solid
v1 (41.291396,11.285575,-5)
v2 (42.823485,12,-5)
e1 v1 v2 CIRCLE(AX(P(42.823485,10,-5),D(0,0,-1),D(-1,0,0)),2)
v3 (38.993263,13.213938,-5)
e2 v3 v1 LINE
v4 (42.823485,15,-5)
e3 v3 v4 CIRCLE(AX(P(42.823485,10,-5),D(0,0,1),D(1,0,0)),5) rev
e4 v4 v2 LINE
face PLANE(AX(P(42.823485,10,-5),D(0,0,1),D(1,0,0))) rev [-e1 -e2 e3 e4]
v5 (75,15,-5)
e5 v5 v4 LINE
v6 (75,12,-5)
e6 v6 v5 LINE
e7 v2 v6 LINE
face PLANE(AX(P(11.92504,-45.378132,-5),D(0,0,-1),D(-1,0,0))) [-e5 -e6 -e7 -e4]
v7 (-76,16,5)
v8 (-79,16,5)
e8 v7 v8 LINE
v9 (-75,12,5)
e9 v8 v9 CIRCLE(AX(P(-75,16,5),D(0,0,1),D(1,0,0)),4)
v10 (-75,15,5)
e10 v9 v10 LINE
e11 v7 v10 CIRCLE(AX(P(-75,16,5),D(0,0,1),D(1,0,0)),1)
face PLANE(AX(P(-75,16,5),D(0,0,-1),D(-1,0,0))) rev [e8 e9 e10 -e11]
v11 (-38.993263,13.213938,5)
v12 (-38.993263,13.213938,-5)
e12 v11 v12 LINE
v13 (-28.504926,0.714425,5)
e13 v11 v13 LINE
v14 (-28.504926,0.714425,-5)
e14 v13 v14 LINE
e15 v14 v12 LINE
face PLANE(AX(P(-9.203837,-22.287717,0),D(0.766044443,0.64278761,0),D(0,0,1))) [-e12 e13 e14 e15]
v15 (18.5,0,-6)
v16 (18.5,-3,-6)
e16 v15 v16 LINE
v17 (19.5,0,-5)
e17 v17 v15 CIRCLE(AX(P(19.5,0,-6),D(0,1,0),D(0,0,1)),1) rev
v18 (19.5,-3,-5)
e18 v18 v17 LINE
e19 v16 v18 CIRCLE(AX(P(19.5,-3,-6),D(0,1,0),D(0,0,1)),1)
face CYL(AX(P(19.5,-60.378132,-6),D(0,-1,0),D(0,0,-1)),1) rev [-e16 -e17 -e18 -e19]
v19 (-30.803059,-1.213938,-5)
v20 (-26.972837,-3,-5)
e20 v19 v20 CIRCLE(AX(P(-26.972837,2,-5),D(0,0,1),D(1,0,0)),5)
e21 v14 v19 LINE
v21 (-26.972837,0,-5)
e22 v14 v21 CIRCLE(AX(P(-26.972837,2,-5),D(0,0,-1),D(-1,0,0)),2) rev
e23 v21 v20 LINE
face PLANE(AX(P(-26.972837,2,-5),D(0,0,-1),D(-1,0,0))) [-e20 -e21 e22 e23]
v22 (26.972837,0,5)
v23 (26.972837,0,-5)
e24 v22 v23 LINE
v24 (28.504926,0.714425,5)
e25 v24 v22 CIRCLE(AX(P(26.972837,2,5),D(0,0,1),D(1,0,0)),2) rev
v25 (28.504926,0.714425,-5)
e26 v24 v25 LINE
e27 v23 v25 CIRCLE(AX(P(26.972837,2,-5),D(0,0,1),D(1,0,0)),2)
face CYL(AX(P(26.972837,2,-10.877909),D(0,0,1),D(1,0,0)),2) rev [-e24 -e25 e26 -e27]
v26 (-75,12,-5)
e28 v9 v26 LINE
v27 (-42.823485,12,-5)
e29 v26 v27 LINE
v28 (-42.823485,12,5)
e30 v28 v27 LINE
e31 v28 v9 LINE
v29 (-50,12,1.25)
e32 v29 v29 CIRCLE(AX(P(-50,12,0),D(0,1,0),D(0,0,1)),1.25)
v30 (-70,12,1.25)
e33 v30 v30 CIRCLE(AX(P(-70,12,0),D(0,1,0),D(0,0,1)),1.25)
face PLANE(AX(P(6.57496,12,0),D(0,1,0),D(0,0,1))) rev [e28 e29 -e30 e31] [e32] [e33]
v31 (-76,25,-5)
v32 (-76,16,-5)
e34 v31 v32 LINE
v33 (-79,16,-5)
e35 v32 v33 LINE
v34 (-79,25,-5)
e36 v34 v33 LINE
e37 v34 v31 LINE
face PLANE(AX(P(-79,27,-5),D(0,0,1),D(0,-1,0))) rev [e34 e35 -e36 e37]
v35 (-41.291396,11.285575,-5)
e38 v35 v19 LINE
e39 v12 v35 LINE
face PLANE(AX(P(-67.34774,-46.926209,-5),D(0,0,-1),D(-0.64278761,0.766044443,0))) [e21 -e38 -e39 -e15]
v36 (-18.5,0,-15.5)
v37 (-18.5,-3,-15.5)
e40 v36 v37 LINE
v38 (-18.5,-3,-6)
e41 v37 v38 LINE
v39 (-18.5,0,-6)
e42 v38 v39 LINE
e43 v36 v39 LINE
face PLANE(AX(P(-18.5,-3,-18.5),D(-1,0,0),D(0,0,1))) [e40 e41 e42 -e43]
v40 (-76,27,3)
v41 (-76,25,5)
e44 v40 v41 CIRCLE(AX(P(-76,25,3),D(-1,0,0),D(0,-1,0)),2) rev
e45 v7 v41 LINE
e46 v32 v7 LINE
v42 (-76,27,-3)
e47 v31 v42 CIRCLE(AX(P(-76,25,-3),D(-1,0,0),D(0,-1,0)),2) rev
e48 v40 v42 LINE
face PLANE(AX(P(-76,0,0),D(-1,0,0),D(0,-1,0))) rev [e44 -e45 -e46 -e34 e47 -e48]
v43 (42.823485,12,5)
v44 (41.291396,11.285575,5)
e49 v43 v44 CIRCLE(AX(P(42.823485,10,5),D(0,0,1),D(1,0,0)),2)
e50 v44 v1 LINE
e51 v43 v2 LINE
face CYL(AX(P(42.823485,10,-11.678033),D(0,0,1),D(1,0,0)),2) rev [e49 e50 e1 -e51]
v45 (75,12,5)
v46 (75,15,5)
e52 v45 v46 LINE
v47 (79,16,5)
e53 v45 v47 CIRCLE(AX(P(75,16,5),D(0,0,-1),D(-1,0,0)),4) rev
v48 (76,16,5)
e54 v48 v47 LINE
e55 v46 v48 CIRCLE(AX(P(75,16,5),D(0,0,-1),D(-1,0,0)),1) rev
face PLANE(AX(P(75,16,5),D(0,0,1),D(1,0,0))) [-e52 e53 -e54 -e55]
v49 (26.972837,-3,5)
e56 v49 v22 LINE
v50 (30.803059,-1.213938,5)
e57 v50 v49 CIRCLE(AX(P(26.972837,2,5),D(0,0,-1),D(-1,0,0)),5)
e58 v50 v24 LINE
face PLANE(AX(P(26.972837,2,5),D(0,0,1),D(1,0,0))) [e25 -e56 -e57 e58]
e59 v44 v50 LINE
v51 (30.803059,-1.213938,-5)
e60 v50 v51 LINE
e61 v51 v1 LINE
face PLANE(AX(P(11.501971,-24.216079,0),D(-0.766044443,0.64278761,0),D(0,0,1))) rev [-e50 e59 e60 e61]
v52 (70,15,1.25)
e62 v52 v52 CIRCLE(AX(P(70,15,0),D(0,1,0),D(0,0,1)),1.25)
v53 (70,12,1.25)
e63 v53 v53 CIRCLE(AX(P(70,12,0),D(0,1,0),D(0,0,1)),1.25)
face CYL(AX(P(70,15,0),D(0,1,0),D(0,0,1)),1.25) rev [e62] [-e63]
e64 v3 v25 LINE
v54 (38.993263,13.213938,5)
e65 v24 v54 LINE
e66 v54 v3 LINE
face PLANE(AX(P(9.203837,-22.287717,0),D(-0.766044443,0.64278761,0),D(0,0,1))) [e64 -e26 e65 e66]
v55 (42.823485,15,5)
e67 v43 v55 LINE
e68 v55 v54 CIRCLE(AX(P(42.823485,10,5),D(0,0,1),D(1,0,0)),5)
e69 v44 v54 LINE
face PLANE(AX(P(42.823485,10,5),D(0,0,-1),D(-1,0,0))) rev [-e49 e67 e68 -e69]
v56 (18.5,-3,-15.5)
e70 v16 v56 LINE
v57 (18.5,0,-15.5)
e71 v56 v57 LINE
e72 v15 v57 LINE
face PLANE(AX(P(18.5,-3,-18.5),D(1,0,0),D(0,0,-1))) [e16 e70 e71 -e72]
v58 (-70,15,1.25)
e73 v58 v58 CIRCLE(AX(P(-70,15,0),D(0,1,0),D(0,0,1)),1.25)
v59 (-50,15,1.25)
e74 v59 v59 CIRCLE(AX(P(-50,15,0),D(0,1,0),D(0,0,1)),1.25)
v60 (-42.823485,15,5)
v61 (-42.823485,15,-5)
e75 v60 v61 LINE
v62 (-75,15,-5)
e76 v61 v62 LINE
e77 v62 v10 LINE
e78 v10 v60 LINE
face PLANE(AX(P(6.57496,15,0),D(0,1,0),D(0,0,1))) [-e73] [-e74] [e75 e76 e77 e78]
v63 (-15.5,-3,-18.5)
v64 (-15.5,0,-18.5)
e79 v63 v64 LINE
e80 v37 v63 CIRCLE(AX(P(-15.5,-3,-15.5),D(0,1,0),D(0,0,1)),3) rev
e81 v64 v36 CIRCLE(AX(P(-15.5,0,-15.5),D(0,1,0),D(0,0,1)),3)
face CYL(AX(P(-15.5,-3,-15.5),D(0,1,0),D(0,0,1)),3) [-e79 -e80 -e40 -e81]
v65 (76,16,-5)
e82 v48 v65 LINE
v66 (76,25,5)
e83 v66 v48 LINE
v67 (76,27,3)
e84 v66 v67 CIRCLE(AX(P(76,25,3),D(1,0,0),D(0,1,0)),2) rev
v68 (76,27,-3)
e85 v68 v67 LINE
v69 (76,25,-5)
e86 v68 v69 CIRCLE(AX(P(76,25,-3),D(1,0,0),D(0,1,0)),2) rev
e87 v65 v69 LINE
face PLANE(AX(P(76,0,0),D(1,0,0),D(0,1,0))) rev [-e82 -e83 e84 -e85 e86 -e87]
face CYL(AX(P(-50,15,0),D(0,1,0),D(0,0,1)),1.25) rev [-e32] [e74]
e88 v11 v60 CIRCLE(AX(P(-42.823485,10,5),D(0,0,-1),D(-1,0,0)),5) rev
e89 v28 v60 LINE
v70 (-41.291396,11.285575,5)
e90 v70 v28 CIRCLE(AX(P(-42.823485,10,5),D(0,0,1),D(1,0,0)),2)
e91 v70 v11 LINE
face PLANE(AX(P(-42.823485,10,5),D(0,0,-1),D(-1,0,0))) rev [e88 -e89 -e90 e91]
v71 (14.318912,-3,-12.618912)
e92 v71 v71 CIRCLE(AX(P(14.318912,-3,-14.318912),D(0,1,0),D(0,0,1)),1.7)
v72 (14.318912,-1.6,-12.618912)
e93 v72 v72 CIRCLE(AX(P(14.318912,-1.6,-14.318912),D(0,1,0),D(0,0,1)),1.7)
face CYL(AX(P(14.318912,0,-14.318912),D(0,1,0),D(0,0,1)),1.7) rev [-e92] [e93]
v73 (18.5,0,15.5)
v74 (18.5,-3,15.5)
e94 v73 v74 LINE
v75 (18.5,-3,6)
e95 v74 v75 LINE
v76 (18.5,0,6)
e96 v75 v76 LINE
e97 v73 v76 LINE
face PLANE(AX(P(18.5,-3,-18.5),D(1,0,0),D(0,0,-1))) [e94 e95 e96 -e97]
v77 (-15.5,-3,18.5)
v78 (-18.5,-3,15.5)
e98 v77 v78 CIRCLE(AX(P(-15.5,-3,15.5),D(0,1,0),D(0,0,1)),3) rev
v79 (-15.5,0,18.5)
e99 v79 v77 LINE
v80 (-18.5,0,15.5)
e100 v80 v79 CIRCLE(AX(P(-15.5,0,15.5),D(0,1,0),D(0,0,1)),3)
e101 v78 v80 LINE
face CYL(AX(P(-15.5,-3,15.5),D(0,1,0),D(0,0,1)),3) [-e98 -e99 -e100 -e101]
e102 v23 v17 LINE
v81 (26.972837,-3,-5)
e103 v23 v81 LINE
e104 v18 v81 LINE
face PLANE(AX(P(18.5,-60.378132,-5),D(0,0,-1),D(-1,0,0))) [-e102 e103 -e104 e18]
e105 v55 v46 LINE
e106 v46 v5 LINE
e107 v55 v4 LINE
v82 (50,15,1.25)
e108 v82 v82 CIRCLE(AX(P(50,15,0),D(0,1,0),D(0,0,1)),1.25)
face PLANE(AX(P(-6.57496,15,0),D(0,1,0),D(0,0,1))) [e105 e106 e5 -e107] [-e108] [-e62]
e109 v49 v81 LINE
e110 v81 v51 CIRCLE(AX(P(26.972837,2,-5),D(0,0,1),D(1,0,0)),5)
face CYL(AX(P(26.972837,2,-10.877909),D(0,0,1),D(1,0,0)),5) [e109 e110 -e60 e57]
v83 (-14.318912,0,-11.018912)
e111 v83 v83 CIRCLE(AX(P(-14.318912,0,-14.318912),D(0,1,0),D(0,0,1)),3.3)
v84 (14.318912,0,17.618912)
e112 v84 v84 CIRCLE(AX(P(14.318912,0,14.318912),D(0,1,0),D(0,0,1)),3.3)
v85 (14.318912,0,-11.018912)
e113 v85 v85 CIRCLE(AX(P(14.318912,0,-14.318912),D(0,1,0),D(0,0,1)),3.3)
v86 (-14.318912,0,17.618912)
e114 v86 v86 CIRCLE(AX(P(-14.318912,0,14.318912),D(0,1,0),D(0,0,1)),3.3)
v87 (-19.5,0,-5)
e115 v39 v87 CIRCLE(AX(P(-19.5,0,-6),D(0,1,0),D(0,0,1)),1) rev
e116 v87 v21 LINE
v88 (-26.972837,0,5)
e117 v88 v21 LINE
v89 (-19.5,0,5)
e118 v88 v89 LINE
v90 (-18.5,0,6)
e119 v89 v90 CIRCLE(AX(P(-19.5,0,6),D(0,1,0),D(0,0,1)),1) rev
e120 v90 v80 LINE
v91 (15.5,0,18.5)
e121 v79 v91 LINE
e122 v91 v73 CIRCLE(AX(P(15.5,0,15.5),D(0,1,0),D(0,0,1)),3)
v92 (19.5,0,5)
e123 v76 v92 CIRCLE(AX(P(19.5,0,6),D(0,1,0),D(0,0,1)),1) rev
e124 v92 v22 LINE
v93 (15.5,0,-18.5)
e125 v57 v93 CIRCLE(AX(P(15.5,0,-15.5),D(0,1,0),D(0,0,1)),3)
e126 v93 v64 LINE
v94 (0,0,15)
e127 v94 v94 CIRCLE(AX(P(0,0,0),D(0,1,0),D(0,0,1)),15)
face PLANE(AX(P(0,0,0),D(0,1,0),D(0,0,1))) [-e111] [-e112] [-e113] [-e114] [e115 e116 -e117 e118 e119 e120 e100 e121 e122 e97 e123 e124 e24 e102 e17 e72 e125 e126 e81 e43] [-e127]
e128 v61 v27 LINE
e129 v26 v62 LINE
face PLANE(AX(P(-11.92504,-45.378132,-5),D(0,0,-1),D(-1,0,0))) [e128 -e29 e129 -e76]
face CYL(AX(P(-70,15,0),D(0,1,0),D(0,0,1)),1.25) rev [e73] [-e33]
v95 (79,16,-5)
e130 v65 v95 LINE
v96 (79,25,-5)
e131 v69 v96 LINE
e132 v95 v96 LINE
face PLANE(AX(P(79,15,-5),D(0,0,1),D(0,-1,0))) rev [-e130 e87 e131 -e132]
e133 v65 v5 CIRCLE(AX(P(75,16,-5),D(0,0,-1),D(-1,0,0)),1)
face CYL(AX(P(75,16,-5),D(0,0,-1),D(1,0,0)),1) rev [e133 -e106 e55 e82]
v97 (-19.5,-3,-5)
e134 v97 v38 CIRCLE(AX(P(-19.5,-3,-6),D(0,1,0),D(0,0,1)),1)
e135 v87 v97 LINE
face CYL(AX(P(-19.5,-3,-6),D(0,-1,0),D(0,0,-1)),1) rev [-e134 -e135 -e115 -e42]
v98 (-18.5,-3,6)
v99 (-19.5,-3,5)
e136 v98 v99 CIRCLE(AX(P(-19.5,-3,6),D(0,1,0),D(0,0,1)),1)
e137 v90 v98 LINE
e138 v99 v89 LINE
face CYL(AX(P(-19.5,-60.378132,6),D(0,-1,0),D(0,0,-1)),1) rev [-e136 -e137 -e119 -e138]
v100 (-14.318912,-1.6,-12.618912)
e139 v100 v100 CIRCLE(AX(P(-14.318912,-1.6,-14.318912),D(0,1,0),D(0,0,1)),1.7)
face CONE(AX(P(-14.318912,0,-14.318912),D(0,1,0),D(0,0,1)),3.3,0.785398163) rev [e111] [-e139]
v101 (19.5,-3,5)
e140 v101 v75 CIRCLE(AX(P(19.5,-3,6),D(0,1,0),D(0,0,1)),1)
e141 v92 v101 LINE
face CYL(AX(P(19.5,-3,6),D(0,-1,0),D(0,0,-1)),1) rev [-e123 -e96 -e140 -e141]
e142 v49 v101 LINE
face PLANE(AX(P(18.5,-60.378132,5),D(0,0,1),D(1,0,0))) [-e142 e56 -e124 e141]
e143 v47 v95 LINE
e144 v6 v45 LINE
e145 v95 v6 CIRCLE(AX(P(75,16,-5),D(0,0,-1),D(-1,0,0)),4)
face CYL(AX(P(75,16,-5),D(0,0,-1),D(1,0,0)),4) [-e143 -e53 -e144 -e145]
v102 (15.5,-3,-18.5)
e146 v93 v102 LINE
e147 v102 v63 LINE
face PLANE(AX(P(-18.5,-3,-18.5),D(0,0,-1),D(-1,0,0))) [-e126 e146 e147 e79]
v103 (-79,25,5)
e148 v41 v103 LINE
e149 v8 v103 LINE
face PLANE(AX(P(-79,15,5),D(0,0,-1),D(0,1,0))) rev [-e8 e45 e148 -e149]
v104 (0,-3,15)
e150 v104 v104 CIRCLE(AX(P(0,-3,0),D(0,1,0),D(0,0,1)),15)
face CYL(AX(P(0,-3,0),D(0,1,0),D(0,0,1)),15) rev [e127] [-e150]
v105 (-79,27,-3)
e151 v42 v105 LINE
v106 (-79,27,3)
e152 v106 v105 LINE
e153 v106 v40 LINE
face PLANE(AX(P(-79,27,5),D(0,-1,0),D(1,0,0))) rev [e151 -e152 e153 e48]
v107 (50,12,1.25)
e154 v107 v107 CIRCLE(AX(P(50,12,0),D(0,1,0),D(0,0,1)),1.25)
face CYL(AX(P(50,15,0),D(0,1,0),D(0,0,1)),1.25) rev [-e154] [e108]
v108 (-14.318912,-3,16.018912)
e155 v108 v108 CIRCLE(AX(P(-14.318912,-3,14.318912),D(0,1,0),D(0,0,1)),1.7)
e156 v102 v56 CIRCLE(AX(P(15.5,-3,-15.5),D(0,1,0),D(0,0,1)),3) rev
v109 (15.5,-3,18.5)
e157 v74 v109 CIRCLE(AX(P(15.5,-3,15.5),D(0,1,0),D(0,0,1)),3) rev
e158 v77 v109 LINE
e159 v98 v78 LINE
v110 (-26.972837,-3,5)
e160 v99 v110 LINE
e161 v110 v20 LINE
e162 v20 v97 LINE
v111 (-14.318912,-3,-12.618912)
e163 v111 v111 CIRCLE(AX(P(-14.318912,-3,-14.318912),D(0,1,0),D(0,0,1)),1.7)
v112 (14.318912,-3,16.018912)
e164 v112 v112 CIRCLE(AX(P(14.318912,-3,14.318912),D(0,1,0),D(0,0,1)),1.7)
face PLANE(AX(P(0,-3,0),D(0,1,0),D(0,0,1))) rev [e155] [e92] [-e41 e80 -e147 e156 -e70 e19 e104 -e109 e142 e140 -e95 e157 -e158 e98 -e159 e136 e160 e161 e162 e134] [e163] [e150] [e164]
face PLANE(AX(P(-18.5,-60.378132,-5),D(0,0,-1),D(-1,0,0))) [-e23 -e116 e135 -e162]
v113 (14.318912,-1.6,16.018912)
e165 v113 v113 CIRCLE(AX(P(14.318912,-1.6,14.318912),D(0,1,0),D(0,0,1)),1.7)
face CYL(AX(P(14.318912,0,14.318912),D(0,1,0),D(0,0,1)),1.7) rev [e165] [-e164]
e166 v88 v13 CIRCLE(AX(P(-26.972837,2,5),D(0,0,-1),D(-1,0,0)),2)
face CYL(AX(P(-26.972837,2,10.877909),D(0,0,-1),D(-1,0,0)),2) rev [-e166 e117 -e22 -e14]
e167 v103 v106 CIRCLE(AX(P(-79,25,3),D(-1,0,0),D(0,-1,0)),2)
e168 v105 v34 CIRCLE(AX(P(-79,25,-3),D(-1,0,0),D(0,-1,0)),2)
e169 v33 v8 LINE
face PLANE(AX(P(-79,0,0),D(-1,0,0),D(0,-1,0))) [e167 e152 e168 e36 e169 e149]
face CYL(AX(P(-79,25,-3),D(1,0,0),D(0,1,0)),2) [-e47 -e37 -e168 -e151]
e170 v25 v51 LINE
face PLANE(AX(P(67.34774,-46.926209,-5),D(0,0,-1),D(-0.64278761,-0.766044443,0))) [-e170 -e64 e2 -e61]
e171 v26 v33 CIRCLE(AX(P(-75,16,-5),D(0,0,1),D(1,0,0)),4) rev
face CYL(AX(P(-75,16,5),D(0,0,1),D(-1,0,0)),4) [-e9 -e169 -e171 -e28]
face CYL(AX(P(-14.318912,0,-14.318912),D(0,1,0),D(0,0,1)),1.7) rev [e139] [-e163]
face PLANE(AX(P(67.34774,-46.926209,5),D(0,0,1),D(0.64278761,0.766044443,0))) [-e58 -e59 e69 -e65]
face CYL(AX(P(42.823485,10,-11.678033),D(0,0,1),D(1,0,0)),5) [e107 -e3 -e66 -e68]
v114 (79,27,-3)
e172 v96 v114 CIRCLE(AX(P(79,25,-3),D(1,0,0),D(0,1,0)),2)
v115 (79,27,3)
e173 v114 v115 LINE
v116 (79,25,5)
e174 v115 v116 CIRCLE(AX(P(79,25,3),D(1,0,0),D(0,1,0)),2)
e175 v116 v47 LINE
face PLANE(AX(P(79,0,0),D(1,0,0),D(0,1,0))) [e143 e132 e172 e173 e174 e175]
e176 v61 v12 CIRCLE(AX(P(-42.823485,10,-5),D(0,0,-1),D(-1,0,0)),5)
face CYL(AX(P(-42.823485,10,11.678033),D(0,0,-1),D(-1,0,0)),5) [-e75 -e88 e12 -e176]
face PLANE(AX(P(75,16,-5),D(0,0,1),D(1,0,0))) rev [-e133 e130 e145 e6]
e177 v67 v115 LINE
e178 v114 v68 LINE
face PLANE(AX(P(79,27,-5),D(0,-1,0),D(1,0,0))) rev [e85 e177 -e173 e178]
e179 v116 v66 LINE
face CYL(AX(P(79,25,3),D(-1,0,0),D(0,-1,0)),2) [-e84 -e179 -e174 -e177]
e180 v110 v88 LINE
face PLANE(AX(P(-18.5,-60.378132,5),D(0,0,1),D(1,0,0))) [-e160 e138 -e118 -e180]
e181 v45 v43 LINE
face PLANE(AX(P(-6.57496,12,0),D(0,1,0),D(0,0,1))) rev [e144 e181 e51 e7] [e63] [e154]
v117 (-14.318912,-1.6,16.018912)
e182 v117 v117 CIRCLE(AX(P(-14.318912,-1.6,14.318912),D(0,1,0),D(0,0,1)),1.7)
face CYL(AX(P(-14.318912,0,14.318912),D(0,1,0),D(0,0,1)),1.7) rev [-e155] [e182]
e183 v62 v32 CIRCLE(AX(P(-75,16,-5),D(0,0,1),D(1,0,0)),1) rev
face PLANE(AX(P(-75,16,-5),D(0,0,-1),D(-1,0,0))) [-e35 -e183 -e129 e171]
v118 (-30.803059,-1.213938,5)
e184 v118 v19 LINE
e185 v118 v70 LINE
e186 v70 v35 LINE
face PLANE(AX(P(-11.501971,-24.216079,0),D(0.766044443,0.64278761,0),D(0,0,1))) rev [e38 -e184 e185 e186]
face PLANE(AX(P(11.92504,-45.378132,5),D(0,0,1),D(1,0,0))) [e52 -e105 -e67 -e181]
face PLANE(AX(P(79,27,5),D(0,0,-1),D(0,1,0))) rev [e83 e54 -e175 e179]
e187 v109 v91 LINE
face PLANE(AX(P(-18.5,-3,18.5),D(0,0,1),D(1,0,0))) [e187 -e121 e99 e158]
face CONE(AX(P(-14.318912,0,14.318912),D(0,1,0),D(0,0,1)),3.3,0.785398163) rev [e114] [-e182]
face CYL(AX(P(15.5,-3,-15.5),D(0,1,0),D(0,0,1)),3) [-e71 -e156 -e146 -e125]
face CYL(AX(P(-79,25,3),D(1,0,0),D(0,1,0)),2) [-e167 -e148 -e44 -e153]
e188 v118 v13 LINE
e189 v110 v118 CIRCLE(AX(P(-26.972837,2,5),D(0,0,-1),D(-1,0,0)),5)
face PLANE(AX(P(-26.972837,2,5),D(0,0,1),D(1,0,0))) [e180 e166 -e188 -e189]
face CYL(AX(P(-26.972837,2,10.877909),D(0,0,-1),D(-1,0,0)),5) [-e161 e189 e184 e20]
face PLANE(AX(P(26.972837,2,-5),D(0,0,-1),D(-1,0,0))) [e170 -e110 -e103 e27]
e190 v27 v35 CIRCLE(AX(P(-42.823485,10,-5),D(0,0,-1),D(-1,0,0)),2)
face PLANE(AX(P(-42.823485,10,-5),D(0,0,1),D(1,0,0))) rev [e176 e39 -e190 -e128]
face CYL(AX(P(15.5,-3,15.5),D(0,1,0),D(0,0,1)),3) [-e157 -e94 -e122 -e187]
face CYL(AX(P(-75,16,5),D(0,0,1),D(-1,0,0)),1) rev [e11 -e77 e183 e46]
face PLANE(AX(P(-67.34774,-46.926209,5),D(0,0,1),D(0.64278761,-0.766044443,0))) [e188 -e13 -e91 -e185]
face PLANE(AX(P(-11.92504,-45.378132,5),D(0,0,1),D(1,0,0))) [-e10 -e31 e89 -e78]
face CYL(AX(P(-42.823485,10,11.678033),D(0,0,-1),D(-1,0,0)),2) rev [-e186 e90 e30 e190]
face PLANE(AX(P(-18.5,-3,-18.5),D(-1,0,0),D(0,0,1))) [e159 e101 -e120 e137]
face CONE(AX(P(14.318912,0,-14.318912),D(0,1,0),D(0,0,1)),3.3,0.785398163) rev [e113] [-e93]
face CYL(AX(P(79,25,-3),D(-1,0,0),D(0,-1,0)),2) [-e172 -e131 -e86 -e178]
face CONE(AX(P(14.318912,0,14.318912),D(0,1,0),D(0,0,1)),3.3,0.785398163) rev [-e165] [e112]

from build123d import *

# Parameters (mm, degrees)
SKETCH_1_W                  = 37
SKETCH_1_H                  = 37
SKETCH_1_R                  = 15
SKETCH_1_R_2                = 1.65
SM_BASE_FLANGE_1_DEPTH      = 3
FILLET_1_R                  = 3
SKETCH_6_W                  = 56.5
SKETCH_6_H                  = 10
EXTRUDE_1_DEPTH             = 3
OTHER_START                 = -5
OTHER_1_DEPTH               = 10
OTHER_1_2_DEPTH             = 10
OTHER_2_DEPTH               = 10
OTHER_2_2_DEPTH             = 10
SM_EDGE_FLANGE_1_DEPTH      = 10
SM_EDGE_FLANGE_2_DEPTH      = 10
SKETCH_18_R                 = 1
CUT_EXTRUDE_2_DEPTH         = 10
HOLE_WIZARD_M3_2_AT_2_COUNT = 2
HOLE_WIZARD_M3_2_AT_2_PITCH = 28.637824638
HOLE_WIZARD_M3_2_AT_3_COUNT = 2
HOLE_WIZARD_M3_2_AT_3_PITCH = 40.5
HOLE_WIZARD_M3_2_AT_4_COUNT = 2
HOLE_WIZARD_M3_2_AT_4_PITCH = 28.637824638
HOLE_WIZARD_M3_2_2_D        = 2.5
FILLET_2_R                  = 2
FILLET_3_R                  = 1


# Read off the part's stored shape, not the designer's step: 转折1, 转折2
# Sheet-metal steps are written as plain solids
with BuildPart() as part:
    # Sketch 1 → 基体-法兰1 (new body)
    with BuildSketch(Plane(origin=(0, 0, 0), x_dir=(1, 0, 0), z_dir=(0, 1, 0))):
        Rectangle(SKETCH_1_W, SKETCH_1_H)
        with Locations(Location((0, 0, 0), (0, 0, 270))):
            Circle(SKETCH_1_R, mode=Mode.SUBTRACT)
        with Locations(Location((-14.318912319, 14.318912319, 0), (0, 0, 270))):
            Circle(SKETCH_1_R_2, mode=Mode.SUBTRACT)
        with Locations(Location((14.318912319, 14.318912319, 0), (0, 0, 270))):
            Circle(SKETCH_1_R_2, mode=Mode.SUBTRACT)
        with Locations(Location((14.318912319, -14.318912319, 0), (0, 0, 270))):
            Circle(SKETCH_1_R_2, mode=Mode.SUBTRACT)
        with Locations(Location((-14.318912319, -14.318912319, 0), (0, 0, 270))):
            Circle(SKETCH_1_R_2, mode=Mode.SUBTRACT)
    extrude(amount=-SM_BASE_FLANGE_1_DEPTH)

    # 圆角1
    fillet_1_edges = [part.edges().sort_by_distance(p)[0] for p in [
        (18.5, -1.5, 18.5),
        (-18.5, -1.5, 18.5),
        (-18.5, -1.5, -18.5),
        (18.5, -1.5, -18.5),
    ]]
    fillet(fillet_1_edges, radius=FILLET_1_R)

    # 草图6 → 凸台-拉伸1 (add)
    with BuildSketch(Plane(origin=(0, 0, 0), x_dir=(1, 0, 0), z_dir=(0, 1, 0))):
        with Locations((-46.75, 0)):
            Rectangle(SKETCH_6_W, SKETCH_6_H)
        with Locations((46.75, 0)):
            Rectangle(SKETCH_6_W, SKETCH_6_H)
    extrude(amount=-EXTRUDE_1_DEPTH)

    # Other 1 outline → Other 1 (cut)
    with BuildSketch(Plane.XY.offset(OTHER_START)):
        with BuildLine():
            ThreePointArc((-26.972836905, -3), (-29.085928213, -2.531538935), (-30.80305912, -1.213938048))
            Line((-30.80305912, -1.213938048), (-31.821674088, 0))
            Line((-31.821674088, 0), (-75, 0))
            Line((-75, 0), (-75, -3))
            Line((-75, -3), (-26.972836905, -3))
        make_face()
    extrude(amount=OTHER_1_DEPTH, mode=Mode.SUBTRACT)

    # Other 1 2 outline → Other 1 2 (add)
    with BuildSketch(Plane.XY.offset(OTHER_START)):
        with BuildLine():
            Line((-41.291396093, 11.285575219), (-31.821674088, 0))
            Line((-31.821674088, 0), (-26.972836905, 0))
            ThreePointArc((-26.972836905, 0), (-27.818073428, 0.187384426), (-28.504925791, 0.714424781))
            Line((-28.504925791, 0.714424781), (-38.993262764, 13.213938048))
            ThreePointArc((-38.993262764, 13.213938048), (-40.710393671, 14.531538935), (-42.823484979, 15))
            Line((-42.823484979, 15), (-75, 15))
            Line((-75, 15), (-75, 12))
            Line((-75, 12), (-42.823484979, 12))
            ThreePointArc((-42.823484979, 12), (-41.978248456, 11.812615574), (-41.291396093, 11.285575219))
        make_face()
    extrude(amount=OTHER_1_2_DEPTH)

    # Other 2 outline → Other 2 (cut)
    with BuildSketch(Plane.XY.offset(OTHER_START)):
        with BuildLine():
            Line((75, 0), (31.821674088, 0))
            Line((31.821674088, 0), (30.80305912, -1.213938048))
            ThreePointArc((30.80305912, -1.213938048), (29.085928213, -2.531538935), (26.972836905, -3))
            Line((26.972836905, -3), (75, -3))
            Line((75, -3), (75, 0))
        make_face()
    extrude(amount=OTHER_2_DEPTH, mode=Mode.SUBTRACT)

    # Other 2 2 outline → Other 2 2 (add)
    with BuildSketch(Plane.XY.offset(OTHER_START)):
        with BuildLine():
            Line((42.823484979, 12), (75, 12))
            Line((75, 12), (75, 15))
            Line((75, 15), (42.823484979, 15))
            ThreePointArc((42.823484979, 15), (40.710393671, 14.531538935), (38.993262764, 13.213938048))
            Line((38.993262764, 13.213938048), (28.504925791, 0.714424781))
            ThreePointArc((28.504925791, 0.714424781), (27.818073428, 0.187384426), (26.972836905, 0))
            Line((26.972836905, 0), (31.821674088, 0))
            Line((31.821674088, 0), (41.291396093, 11.285575219))
            ThreePointArc((41.291396093, 11.285575219), (41.978248456, 11.812615574), (42.823484979, 12))
        make_face()
    extrude(amount=OTHER_2_2_DEPTH)

    # 边线-法兰1 section (across the edge) → 边线-法兰1 (add)
    with BuildSketch(Plane(origin=(76, 15, 5), x_dir=(-1, 0, 0), z_dir=(0, 0, -1))):
        with BuildLine():
            Line((-3, 1), (-3, 12))
            Line((-3, 12), (0, 12))
            Line((0, 12), (0, 1))
            ThreePointArc((0, 1), (0.292893219, 0.292893219), (1, 0))
            Line((1, 0), (1, -3))
            ThreePointArc((1, -3), (-1.828427125, -1.828427125), (-3, 1))
        make_face()
    extrude(amount=SM_EDGE_FLANGE_1_DEPTH)

    # 边线-法兰2 section (across the edge) → 边线-法兰2 (add)
    with BuildSketch(Plane(origin=(-76, 15, -5), x_dir=(1, 0, 0), z_dir=(0, 0, 1))):
        with BuildLine():
            Line((-3, 1), (-3, 12))
            Line((-3, 12), (0, 12))
            Line((0, 12), (0, 1))
            ThreePointArc((0, 1), (0.292893219, 0.292893219), (1, 0))
            Line((1, 0), (1, -3))
            ThreePointArc((1, -3), (-1.828427125, -1.828427125), (-3, 1))
        make_face()
    extrude(amount=SM_EDGE_FLANGE_2_DEPTH)

    # 草图18 → 切除-拉伸2 (cut)
    with BuildSketch(Plane.ZX.offset(15)):
        with Locations(Location((0, 50, 0), (0, 0, 270))):
            Circle(SKETCH_18_R)
        with Locations(Location((0, 70, 0), (0, 0, 270))):
            Circle(SKETCH_18_R)
        with Locations((0, -70)):
            Circle(SKETCH_18_R)
        with Locations((0, -50)):
            Circle(SKETCH_18_R)
    extrude(amount=-CUT_EXTRUDE_2_DEPTH, mode=Mode.SUBTRACT)

    # 草图24 → Hole Wizard M3 _2 (revolve, cut)
    with BuildSketch(Plane(origin=(-14.318912319, 0, -14.318912319), x_dir=(0, 0, 1), z_dir=(1, 0, 0))):
        Polygon((0, 0), (0, 3), (1.7, 3), (1.7, 1.6), (3.3, 0), align=None)
    hole_wizard_m3_2 = revolve(axis=Axis((-14.318912319, 6.35, -14.318912319), (0, -1, 0)), mode=Mode.SUBTRACT)

    # Hole Wizard M3 _2 at 2: Hole Wizard M3 _2 ×2
    with Locations(*[(i * HOLE_WIZARD_M3_2_AT_2_PITCH, 0, 0) for i in range(1, HOLE_WIZARD_M3_2_AT_2_COUNT)]):
        add(hole_wizard_m3_2, mode=Mode.SUBTRACT)

    # Hole Wizard M3 _2 at 3: Hole Wizard M3 _2 ×2
    with Locations(*[Vector(0.7071067811865451, 0, 0.70710678118655) * (i * HOLE_WIZARD_M3_2_AT_3_PITCH) for i in range(1, HOLE_WIZARD_M3_2_AT_3_COUNT)]):
        add(hole_wizard_m3_2, mode=Mode.SUBTRACT)

    # Hole Wizard M3 _2 at 4: Hole Wizard M3 _2 ×2
    with Locations(*[(0, 0, i * HOLE_WIZARD_M3_2_AT_4_PITCH) for i in range(1, HOLE_WIZARD_M3_2_AT_4_COUNT)]):
        add(hole_wizard_m3_2, mode=Mode.SUBTRACT)

    # Hole Wizard M3 _2 2 (through all)
    with Locations(Plane(origin=(0, 15, 0), x_dir=(1, 0, 0), z_dir=(0, 1, 0))):
        with Locations((-70, 0), (-50, 0), (50, 0), (70, 0)):
            Hole(HOLE_WIZARD_M3_2_2_D / 2)

    # 圆角2
    fillet_2_edges = [part.edges().sort_by_distance(p)[0] for p in [
        (77.5, 27, 5),
        (77.5, 27, -5),
        (-77.5, 27, -5),
        (-77.5, 27, 5),
    ]]
    fillet(fillet_2_edges, radius=FILLET_2_R)

    # 圆角3
    fillet_3_edges = [part.edges().sort_by_distance(p)[0] for p in [
        (18.5, -1.5, -5),
        (18.5, -1.5, 5),
        (-18.5, -1.5, -5),
        (-18.5, -1.5, 5),
    ]]
    fillet(fillet_3_edges, radius=FILLET_3_R)


solid = part.part
